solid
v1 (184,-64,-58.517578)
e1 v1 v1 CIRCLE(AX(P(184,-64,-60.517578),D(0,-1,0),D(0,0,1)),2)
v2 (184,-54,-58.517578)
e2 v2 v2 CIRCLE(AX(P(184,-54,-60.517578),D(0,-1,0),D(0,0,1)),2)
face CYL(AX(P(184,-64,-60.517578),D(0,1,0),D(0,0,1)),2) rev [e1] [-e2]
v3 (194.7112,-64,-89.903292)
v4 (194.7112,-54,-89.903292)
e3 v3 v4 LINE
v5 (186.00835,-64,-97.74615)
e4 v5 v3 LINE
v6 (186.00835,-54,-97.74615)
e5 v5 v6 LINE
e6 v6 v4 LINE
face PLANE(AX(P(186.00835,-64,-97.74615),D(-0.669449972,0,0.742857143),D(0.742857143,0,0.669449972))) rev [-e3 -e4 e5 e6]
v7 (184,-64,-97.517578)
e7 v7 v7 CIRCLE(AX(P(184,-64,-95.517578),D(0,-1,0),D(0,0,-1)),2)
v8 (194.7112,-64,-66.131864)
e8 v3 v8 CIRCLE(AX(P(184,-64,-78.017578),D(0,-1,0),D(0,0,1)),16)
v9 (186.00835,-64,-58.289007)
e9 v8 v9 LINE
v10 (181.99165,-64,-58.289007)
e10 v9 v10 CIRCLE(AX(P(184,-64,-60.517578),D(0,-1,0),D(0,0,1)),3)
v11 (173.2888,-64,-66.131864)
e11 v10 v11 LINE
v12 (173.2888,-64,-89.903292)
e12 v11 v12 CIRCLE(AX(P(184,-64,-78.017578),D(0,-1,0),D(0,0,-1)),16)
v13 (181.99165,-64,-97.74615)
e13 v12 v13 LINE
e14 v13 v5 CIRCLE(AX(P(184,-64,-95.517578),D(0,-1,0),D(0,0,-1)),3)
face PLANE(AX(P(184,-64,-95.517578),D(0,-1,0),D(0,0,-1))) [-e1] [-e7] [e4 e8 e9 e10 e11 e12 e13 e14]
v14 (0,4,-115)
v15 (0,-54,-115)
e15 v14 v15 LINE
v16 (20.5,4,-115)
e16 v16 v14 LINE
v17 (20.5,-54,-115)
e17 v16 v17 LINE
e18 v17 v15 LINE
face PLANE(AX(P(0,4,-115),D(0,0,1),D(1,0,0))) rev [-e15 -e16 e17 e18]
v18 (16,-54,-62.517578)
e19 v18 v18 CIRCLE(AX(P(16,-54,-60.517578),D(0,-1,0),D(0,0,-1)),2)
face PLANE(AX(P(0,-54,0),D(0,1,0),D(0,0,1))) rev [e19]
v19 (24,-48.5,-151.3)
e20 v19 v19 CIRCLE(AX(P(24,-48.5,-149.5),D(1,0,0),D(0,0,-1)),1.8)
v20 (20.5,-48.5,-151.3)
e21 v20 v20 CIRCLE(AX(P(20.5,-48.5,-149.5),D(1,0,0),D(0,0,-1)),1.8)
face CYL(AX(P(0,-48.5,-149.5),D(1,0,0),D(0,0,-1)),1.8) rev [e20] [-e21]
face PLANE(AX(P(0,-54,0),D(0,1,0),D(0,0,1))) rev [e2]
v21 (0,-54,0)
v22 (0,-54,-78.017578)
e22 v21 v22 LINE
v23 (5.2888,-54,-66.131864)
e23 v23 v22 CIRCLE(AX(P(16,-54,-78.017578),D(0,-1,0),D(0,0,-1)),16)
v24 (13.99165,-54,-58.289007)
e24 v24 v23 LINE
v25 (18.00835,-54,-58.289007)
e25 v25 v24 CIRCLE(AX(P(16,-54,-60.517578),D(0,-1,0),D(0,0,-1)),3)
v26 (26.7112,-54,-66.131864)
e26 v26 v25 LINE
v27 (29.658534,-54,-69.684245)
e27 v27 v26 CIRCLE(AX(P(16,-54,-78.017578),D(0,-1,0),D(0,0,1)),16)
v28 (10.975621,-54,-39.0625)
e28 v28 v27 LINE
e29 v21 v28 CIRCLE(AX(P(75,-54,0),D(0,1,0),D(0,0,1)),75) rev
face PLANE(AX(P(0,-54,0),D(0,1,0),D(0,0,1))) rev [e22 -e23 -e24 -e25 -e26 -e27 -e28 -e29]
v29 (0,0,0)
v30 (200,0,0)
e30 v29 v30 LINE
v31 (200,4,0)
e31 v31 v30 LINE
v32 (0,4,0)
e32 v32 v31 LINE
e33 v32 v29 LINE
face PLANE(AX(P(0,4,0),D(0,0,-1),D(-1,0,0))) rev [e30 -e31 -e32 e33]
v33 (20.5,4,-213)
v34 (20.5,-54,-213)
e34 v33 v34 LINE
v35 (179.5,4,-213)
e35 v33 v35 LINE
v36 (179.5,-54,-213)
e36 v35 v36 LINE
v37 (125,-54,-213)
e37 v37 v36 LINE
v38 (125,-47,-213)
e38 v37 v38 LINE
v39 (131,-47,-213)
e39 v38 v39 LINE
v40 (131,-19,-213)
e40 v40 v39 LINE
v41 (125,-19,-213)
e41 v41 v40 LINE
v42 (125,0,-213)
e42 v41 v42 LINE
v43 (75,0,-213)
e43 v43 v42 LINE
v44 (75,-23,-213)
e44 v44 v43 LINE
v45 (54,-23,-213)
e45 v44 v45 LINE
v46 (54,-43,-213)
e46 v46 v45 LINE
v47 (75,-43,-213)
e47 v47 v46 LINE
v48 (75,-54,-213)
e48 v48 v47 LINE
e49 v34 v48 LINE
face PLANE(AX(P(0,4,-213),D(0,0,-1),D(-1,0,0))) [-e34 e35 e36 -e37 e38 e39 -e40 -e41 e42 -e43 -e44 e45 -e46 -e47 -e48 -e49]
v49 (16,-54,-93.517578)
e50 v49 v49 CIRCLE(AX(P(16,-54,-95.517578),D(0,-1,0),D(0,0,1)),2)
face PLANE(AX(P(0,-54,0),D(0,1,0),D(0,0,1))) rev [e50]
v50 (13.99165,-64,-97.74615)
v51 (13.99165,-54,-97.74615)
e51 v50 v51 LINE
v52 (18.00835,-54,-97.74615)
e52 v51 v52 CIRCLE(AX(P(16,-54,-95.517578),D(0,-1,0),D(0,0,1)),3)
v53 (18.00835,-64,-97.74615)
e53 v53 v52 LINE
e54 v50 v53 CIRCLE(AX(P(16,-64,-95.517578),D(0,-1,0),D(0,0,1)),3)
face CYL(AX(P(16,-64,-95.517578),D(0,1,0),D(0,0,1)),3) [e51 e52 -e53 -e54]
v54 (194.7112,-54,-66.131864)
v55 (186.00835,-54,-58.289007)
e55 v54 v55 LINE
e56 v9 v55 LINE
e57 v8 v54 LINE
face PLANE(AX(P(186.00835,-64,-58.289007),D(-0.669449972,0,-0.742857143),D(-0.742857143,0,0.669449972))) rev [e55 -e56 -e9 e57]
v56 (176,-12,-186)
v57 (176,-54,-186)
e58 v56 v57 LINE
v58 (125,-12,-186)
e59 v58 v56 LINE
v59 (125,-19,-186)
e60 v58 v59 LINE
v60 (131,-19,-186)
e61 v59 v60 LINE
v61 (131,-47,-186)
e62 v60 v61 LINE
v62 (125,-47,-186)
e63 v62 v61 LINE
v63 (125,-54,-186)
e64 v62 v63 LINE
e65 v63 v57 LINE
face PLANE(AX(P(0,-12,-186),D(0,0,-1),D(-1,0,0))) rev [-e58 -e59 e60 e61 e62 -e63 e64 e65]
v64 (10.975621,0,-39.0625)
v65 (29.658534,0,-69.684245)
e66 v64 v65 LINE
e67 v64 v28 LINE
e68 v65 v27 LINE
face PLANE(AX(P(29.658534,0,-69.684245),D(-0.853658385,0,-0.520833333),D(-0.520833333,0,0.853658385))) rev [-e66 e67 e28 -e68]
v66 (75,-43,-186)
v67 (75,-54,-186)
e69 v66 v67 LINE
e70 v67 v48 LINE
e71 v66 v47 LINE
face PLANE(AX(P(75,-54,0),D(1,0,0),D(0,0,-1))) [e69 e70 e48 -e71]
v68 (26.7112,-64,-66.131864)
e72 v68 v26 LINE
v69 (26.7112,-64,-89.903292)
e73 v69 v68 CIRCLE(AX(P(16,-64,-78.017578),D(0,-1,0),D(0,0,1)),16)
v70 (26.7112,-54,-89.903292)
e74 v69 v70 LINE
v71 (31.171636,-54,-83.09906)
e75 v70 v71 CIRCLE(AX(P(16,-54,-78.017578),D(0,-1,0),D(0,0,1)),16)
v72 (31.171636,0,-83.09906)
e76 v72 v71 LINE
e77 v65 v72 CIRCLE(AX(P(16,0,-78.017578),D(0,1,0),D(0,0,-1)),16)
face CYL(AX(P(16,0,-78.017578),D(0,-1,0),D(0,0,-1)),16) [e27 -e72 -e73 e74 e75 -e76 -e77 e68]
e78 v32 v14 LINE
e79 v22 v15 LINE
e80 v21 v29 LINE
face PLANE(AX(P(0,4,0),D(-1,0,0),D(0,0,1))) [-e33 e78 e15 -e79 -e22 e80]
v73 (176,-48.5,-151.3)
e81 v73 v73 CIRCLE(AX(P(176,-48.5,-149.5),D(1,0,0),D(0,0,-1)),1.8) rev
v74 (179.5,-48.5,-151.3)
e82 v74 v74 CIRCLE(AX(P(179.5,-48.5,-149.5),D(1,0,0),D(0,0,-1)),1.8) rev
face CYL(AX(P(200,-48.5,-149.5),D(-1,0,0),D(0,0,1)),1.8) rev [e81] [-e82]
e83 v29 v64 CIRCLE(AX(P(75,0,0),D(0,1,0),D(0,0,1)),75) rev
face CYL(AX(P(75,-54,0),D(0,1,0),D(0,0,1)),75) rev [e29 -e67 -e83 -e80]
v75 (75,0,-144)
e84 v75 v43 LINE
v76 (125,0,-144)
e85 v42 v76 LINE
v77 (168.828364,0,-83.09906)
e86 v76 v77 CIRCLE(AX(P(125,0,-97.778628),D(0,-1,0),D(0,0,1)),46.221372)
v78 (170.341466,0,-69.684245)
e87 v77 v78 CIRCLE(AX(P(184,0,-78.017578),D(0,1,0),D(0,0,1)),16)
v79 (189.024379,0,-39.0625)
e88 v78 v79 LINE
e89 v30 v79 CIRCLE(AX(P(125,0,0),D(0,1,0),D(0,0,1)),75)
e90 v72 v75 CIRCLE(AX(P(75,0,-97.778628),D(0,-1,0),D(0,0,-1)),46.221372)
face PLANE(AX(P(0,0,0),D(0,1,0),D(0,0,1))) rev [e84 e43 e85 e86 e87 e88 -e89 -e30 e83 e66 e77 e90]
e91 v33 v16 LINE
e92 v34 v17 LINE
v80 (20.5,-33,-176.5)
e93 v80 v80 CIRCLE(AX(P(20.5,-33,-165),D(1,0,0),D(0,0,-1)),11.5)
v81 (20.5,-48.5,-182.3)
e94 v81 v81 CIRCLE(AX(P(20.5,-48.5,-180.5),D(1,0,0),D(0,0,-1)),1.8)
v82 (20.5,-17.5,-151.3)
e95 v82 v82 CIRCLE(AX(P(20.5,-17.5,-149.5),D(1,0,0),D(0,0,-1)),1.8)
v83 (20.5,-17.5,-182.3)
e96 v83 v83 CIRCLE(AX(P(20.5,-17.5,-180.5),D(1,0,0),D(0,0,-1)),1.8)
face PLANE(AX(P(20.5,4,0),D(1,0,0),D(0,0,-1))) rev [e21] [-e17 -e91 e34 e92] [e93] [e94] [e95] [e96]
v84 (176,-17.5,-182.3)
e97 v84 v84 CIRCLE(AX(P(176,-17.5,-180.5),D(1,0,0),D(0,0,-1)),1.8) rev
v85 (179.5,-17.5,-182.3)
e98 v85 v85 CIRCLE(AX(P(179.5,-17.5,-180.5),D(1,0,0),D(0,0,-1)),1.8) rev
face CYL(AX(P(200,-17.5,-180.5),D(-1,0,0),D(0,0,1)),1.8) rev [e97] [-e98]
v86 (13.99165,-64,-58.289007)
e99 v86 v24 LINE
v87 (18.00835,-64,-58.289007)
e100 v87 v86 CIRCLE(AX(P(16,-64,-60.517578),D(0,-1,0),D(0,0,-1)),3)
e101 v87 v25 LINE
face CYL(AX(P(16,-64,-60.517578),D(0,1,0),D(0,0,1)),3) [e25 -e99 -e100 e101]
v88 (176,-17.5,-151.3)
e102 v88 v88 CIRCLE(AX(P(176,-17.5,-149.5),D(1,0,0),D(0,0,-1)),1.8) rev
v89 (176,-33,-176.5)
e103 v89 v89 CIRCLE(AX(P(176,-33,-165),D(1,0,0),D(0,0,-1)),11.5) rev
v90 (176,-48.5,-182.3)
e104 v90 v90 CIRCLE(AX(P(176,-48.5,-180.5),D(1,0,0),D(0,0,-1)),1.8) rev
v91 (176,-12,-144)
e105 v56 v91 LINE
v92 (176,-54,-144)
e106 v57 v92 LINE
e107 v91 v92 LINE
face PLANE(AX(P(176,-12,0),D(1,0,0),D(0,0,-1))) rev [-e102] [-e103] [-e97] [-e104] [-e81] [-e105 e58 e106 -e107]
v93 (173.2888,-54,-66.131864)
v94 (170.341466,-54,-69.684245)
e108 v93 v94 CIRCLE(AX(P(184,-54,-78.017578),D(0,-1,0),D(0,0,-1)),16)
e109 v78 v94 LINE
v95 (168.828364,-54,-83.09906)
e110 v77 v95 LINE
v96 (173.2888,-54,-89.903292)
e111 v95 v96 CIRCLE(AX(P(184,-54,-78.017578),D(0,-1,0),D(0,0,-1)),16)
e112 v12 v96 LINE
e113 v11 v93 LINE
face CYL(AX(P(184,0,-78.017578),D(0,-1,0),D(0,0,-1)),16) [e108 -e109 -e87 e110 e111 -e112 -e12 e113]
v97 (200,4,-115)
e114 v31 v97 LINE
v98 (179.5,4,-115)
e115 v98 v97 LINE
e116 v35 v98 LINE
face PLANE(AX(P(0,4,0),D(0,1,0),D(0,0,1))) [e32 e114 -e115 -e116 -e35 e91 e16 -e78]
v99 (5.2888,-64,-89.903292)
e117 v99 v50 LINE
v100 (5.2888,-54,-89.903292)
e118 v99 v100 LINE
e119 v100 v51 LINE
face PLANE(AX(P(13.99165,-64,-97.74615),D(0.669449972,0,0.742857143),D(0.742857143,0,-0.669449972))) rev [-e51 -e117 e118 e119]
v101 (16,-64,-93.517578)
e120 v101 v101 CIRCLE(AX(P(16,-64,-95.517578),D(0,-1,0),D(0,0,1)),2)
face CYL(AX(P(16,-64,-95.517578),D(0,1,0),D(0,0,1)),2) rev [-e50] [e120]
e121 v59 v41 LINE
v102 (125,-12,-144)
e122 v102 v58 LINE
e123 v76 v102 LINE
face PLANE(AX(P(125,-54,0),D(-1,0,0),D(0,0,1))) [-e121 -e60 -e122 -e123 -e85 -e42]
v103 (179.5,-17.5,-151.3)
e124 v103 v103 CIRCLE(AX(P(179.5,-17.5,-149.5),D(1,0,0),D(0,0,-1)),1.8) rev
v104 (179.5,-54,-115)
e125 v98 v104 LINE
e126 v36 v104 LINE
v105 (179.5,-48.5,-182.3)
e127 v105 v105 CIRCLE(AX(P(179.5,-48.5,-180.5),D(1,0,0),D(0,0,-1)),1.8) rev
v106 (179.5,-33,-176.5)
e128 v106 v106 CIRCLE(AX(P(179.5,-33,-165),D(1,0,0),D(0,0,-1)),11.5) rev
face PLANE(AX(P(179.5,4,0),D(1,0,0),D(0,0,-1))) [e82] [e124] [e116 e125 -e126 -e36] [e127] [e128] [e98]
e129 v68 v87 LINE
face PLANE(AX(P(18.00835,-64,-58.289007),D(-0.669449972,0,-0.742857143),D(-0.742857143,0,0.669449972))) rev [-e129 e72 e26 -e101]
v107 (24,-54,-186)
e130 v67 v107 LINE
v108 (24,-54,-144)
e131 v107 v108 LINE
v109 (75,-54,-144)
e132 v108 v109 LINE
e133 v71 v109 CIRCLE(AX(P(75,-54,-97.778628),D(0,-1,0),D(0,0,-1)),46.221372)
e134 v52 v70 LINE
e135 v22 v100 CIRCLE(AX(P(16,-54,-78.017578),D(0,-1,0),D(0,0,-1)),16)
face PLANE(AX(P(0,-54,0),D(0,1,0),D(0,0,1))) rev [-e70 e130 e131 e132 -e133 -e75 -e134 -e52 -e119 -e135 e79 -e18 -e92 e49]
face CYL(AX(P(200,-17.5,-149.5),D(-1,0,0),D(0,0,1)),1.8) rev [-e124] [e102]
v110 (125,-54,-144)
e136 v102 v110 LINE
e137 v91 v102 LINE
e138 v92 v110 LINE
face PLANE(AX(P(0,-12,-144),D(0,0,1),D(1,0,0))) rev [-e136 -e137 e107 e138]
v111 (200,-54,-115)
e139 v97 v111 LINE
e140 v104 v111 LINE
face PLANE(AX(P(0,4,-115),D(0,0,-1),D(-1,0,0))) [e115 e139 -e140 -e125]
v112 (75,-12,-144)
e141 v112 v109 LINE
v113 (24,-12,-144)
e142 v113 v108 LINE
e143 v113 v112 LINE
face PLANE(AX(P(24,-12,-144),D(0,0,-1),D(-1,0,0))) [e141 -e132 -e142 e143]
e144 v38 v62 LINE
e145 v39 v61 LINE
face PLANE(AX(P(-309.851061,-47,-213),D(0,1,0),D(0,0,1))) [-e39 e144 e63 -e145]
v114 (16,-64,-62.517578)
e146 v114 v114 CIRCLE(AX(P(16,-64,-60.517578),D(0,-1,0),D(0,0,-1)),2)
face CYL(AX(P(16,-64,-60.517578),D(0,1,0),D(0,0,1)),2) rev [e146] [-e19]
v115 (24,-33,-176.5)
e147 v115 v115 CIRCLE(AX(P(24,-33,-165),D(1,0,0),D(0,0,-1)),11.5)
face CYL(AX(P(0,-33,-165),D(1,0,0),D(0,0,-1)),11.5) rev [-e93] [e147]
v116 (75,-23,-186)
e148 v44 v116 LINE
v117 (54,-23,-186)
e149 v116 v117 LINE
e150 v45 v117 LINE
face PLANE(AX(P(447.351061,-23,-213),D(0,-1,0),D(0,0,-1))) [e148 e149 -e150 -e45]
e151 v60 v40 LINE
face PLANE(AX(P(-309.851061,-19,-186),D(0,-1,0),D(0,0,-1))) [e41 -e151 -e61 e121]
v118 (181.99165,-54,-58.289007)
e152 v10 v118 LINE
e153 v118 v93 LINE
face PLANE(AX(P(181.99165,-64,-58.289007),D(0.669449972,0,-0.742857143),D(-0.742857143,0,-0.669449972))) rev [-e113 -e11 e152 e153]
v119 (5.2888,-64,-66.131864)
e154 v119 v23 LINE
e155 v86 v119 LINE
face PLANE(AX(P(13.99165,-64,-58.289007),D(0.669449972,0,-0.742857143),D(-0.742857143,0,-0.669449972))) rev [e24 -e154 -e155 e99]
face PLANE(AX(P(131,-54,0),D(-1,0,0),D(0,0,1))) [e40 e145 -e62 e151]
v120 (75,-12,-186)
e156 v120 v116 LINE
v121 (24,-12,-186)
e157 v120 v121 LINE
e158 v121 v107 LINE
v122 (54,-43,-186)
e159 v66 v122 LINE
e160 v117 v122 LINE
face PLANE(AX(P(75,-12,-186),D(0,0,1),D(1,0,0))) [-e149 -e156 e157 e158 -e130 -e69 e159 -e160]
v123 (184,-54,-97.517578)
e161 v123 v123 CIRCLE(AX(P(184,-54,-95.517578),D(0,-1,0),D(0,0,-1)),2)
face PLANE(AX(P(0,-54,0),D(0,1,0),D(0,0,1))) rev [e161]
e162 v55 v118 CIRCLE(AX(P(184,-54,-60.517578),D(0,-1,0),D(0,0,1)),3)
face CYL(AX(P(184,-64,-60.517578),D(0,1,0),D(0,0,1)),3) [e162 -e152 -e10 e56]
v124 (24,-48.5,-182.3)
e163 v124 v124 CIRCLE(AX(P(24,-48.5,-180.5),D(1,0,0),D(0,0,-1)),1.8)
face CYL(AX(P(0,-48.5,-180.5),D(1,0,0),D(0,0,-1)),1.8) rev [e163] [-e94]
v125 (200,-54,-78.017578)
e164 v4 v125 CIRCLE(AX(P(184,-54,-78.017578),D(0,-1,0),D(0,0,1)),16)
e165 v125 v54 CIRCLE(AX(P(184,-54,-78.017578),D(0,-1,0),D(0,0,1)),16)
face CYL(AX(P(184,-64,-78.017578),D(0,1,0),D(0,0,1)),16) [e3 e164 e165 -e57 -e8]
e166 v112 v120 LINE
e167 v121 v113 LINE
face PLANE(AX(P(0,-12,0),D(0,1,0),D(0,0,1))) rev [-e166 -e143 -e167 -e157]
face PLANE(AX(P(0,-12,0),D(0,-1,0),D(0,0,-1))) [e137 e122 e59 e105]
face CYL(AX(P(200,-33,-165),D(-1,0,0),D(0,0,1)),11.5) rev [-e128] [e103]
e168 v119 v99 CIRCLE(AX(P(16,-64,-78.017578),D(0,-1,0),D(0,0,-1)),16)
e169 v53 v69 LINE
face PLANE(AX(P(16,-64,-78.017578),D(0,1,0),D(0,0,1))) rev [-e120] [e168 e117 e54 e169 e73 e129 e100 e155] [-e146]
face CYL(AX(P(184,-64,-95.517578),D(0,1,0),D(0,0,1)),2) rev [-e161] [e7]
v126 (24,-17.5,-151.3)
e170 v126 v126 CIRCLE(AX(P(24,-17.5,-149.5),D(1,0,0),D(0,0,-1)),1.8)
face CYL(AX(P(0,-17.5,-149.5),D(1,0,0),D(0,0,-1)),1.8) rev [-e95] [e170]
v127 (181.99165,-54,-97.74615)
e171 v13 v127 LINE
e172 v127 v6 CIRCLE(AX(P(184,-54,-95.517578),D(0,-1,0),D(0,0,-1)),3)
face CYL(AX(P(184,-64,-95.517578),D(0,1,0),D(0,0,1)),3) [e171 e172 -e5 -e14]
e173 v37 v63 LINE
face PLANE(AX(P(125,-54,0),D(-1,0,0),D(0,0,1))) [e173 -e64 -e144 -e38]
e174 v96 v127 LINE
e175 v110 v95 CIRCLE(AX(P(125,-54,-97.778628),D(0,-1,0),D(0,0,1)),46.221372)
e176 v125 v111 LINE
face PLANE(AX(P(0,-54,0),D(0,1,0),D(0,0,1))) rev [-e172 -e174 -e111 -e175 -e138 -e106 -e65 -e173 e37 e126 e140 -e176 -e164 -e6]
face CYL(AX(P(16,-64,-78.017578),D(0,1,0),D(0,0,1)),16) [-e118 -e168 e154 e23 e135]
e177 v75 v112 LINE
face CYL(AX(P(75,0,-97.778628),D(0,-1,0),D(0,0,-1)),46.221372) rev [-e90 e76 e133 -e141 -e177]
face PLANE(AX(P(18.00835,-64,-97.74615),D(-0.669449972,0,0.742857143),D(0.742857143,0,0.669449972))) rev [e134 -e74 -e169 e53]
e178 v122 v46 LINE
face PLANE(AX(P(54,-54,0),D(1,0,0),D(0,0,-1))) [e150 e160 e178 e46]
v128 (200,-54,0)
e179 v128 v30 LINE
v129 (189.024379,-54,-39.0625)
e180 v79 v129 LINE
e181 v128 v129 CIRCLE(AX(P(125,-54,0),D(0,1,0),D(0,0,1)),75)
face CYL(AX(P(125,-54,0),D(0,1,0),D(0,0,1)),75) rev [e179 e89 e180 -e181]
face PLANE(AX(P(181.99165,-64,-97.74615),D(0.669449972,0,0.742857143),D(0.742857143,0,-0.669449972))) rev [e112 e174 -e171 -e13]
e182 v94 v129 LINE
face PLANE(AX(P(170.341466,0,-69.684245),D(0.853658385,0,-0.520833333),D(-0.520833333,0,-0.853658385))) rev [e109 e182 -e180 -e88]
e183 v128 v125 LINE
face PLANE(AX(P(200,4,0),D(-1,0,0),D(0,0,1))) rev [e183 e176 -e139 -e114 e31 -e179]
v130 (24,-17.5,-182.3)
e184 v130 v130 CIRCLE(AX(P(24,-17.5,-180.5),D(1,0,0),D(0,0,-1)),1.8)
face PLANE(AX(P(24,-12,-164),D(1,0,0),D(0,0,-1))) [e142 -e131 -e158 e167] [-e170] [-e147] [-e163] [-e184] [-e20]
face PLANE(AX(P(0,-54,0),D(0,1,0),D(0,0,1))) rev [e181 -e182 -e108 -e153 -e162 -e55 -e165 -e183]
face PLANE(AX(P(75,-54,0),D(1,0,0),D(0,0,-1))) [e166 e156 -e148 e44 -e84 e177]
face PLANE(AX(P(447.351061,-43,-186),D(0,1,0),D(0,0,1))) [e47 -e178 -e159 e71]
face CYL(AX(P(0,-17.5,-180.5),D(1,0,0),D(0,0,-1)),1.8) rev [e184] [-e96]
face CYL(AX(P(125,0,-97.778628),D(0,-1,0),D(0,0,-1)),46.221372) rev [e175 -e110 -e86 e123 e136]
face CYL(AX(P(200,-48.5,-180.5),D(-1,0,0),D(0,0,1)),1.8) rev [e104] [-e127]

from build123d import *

# Parameters (mm, degrees)
SKETCH_1_W              = 200
SKETCH_1_H              = 213
EXTRUDE_1_DEPTH         = 4
EXTRUDE_2_DEPTH         = 54
CUT_EXTRUDE_2_DEPTH     = 298.880848663
CUT_EXTRUDE_3_DEPTH     = 42
SKETCH_7_R              = 1.8
SKETCH_7_R_2            = 11.5
CUT_EXTRUDE_4_DEPTH     = 282.53330176
MIRROR_START            = 176
MIRROR_1_OUTLINE_R      = 1.8
MIRROR_1_OUTLINE_R_2    = 11.5
MIRROR_1_DEPTH          = 3.5
CUT_EXTRUDE_START       = -21
CUT_EXTRUDE_5_OUTLINE_W = 27
CUT_EXTRUDE_5_OUTLINE_H = 20
CUT_EXTRUDE_5_DEPTH     = 21
CUT_EXTRUDE_START_2     = -6
CUT_EXTRUDE_6_OUTLINE_W = 27
CUT_EXTRUDE_6_OUTLINE_H = 28
CUT_EXTRUDE_6_DEPTH     = 6
CUT_EXTRUDE_START_3     = -54
CUT_EXTRUDE_7_DEPTH     = 54
SKETCH_12_R             = 2
EXTRUDE_3_DEPTH         = 10


# Read off the part's stored shape, not the designer's step: 镜向1, 切除-拉伸5, 切除-拉伸6
with BuildPart() as part:
    # 草图1 → 凸台-拉伸1 (new body)
    with BuildSketch(Plane(origin=(0, 0, 0), x_dir=(1, 0, 0), z_dir=(0, 1, 0))):
        with Locations((100, 106.5)):
            Rectangle(SKETCH_1_W, SKETCH_1_H)
    extrude(amount=EXTRUDE_1_DEPTH)

    # 草图1<4> → 凸台-拉伸2 (add)
    with BuildSketch(Plane(origin=(0, 0, 0), x_dir=(1, 0, 0), z_dir=(0, 1, 0))):
        with BuildLine():
            Line((0, 213), (0, 0))
            ThreePointArc((0, 0), (21.966991411, 53.033008589), (75, 75))
            Line((75, 75), (75, 213))
            Line((75, 213), (0, 213))
        make_face()
        with BuildLine():
            Line((125, 213), (125, 75))
            ThreePointArc((125, 75), (178.033008589, 53.033008589), (200, 0))
            Line((200, 0), (200, 213))
            Line((200, 213), (125, 213))
        make_face()
    extrude(amount=-EXTRUDE_2_DEPTH)

    # 草图3 → 切除-拉伸2 (cut, through all)
    with BuildSketch(Plane.XZ.offset(54)):
        Polygon((20.5, -186), (20.5, -165), (20.5, -144), (20.5, -115), (0, -115), (0, -213), (20.5, -213), align=None)
        Polygon((179.5, -115), (200, -115), (200, -213), (179.5, -213), (179.5, -165), align=None)
    extrude(amount=-CUT_EXTRUDE_2_DEPTH, mode=Mode.SUBTRACT)

    # 草图5 → 切除-拉伸3 (cut)
    with BuildSketch(Plane.XZ.offset(54)):
        Polygon((176, -164), (176, -144), (125, -144), (125, -186), (176, -186), align=None)
        Polygon((24, -164), (24, -144), (75, -144), (75, -186), (24, -186), align=None)
    extrude(amount=-CUT_EXTRUDE_3_DEPTH, mode=Mode.SUBTRACT)

    # 草图7 → 切除-拉伸4 (cut, through all)
    with BuildSketch(Plane(origin=(24, 0, 0), x_dir=(0, 0, -1), z_dir=(1, 0, 0))):
        with Locations((180.5, -17.5)):
            Circle(SKETCH_7_R)
        with Locations((149.5, -17.5)):
            Circle(SKETCH_7_R)
        with Locations((165, -33)):
            Circle(SKETCH_7_R_2)
        with Locations((180.5, -48.5)):
            Circle(SKETCH_7_R)
        with Locations((149.5, -48.5)):
            Circle(SKETCH_7_R)
    extrude(amount=-CUT_EXTRUDE_4_DEPTH, mode=Mode.SUBTRACT)

    # 镜向1 outline → 镜向1 (cut)
    with BuildSketch(Plane.YZ.offset(MIRROR_START)):
        with Locations((-17.5, -180.5)):
            Circle(MIRROR_1_OUTLINE_R)
        with Locations((-17.5, -149.5)):
            Circle(MIRROR_1_OUTLINE_R)
        with Locations((-33, -165)):
            Circle(MIRROR_1_OUTLINE_R_2)
        with Locations((-48.5, -180.5)):
            Circle(MIRROR_1_OUTLINE_R)
        with Locations((-48.5, -149.5)):
            Circle(MIRROR_1_OUTLINE_R)
    extrude(amount=MIRROR_1_DEPTH, mode=Mode.SUBTRACT)

    # 切除-拉伸5 outline → 切除-拉伸5 (cut)
    with BuildSketch(Plane(origin=(75, 0, 0), x_dir=(0, 0, -1), z_dir=(1, 0, 0)).offset(CUT_EXTRUDE_START)):
        with Locations((199.5, -33)):
            Rectangle(CUT_EXTRUDE_5_OUTLINE_W, CUT_EXTRUDE_5_OUTLINE_H)
    extrude(amount=CUT_EXTRUDE_5_DEPTH, mode=Mode.SUBTRACT)

    # 切除-拉伸6 outline → 切除-拉伸6 (cut)
    with BuildSketch(Plane.ZY.offset(-125).offset(CUT_EXTRUDE_START_2)):
        with Locations((-199.5, -33)):
            Rectangle(CUT_EXTRUDE_6_OUTLINE_W, CUT_EXTRUDE_6_OUTLINE_H)
    extrude(amount=CUT_EXTRUDE_6_DEPTH, mode=Mode.SUBTRACT)

    # 草图11 → 切除-拉伸7 (cut)
    with BuildSketch(Plane.XZ.offset(54).offset(CUT_EXTRUDE_START_3)):
        with BuildLine():
            Line((29.658534166, -69.684244774), (10.975621098, -39.0625))
            ThreePointArc((10.975621098, -39.0625), (38.289562111, -65.401404801), (75, -75))
            Line((75, -75), (75, -144))
            ThreePointArc((75, -144), (37.483837038, -124.777752739), (31.171635941, -83.099060455))
            ThreePointArc((31.171635941, -83.099060455), (31.899182276, -76.224256342), (29.658534166, -69.684244774))
        make_face()
        with BuildLine():
            Line((125, -144), (125, -75))
            ThreePointArc((125, -75), (161.710437889, -65.401404801), (189.024378902, -39.0625))
            Line((189.024378902, -39.0625), (170.341465834, -69.684244774))
            ThreePointArc((170.341465834, -69.684244774), (168.100817724, -76.224256342), (168.828364059, -83.099060455))
            ThreePointArc((168.828364059, -83.099060455), (162.516162962, -124.777752739), (125, -144))
        make_face()
    extrude(amount=CUT_EXTRUDE_7_DEPTH, mode=Mode.SUBTRACT)

    # 草图12 → 凸台-拉伸3 (add)
    # profile 1 of 2: a face of its own
    with BuildSketch(Plane.XZ.offset(54)):
        with BuildLine():
            Line((18.008349917, -58.289006678), (26.711199556, -66.131863821))
            ThreePointArc((26.711199556, -66.131863821), (32, -78.017578107), (26.711199556, -89.903292393))
            Line((26.711199556, -89.903292393), (18.008349917, -97.746149535))
            ThreePointArc((18.008349917, -97.746149535), (16, -98.517578107), (13.991650083, -97.746149535))
            Line((13.991650083, -97.746149535), (5.288800444, -89.903292393))
            ThreePointArc((5.288800444, -89.903292393), (0, -78.017578107), (5.288800444, -66.131863821))
            Line((5.288800444, -66.131863821), (13.991650083, -58.289006678))
            ThreePointArc((13.991650083, -58.289006678), (16, -57.517578107), (18.008349917, -58.289006678))
        make_face()
        with Locations(Location((16, -60.517578107, 0), (0, 0, 270))):
            Circle(SKETCH_12_R, mode=Mode.SUBTRACT)
        with Locations(Location((16, -95.517578107, 0), (0, 0, 90))):
            Circle(SKETCH_12_R, mode=Mode.SUBTRACT)
    # profile 2 of 2: a face of its own
    with BuildSketch(Plane.XZ.offset(54)):
        with BuildLine():
            Line((186.008349917, -97.746149535), (194.711199556, -89.903292393))
            ThreePointArc((194.711199556, -89.903292393), (200, -78.017578107), (194.711199556, -66.131863821))
            Line((194.711199556, -66.131863821), (186.008349917, -58.289006678))
            ThreePointArc((186.008349917, -58.289006678), (184, -57.517578107), (181.991650083, -58.289006678))
            Line((181.991650083, -58.289006678), (173.288800444, -66.131863821))
            ThreePointArc((173.288800444, -66.131863821), (168, -78.017578107), (173.288800444, -89.903292393))
            Line((173.288800444, -89.903292393), (181.991650083, -97.746149535))
            ThreePointArc((181.991650083, -97.746149535), (184, -98.517578107), (186.008349917, -97.746149535))
        make_face()
        with Locations(Location((184, -95.517578107, 0), (0, 0, 270))):
            Circle(SKETCH_12_R, mode=Mode.SUBTRACT)
        with Locations(Location((184, -60.517578107, 0), (0, 0, 90))):
            Circle(SKETCH_12_R, mode=Mode.SUBTRACT)
    extrude(amount=EXTRUDE_3_DEPTH)


solid = part.part
